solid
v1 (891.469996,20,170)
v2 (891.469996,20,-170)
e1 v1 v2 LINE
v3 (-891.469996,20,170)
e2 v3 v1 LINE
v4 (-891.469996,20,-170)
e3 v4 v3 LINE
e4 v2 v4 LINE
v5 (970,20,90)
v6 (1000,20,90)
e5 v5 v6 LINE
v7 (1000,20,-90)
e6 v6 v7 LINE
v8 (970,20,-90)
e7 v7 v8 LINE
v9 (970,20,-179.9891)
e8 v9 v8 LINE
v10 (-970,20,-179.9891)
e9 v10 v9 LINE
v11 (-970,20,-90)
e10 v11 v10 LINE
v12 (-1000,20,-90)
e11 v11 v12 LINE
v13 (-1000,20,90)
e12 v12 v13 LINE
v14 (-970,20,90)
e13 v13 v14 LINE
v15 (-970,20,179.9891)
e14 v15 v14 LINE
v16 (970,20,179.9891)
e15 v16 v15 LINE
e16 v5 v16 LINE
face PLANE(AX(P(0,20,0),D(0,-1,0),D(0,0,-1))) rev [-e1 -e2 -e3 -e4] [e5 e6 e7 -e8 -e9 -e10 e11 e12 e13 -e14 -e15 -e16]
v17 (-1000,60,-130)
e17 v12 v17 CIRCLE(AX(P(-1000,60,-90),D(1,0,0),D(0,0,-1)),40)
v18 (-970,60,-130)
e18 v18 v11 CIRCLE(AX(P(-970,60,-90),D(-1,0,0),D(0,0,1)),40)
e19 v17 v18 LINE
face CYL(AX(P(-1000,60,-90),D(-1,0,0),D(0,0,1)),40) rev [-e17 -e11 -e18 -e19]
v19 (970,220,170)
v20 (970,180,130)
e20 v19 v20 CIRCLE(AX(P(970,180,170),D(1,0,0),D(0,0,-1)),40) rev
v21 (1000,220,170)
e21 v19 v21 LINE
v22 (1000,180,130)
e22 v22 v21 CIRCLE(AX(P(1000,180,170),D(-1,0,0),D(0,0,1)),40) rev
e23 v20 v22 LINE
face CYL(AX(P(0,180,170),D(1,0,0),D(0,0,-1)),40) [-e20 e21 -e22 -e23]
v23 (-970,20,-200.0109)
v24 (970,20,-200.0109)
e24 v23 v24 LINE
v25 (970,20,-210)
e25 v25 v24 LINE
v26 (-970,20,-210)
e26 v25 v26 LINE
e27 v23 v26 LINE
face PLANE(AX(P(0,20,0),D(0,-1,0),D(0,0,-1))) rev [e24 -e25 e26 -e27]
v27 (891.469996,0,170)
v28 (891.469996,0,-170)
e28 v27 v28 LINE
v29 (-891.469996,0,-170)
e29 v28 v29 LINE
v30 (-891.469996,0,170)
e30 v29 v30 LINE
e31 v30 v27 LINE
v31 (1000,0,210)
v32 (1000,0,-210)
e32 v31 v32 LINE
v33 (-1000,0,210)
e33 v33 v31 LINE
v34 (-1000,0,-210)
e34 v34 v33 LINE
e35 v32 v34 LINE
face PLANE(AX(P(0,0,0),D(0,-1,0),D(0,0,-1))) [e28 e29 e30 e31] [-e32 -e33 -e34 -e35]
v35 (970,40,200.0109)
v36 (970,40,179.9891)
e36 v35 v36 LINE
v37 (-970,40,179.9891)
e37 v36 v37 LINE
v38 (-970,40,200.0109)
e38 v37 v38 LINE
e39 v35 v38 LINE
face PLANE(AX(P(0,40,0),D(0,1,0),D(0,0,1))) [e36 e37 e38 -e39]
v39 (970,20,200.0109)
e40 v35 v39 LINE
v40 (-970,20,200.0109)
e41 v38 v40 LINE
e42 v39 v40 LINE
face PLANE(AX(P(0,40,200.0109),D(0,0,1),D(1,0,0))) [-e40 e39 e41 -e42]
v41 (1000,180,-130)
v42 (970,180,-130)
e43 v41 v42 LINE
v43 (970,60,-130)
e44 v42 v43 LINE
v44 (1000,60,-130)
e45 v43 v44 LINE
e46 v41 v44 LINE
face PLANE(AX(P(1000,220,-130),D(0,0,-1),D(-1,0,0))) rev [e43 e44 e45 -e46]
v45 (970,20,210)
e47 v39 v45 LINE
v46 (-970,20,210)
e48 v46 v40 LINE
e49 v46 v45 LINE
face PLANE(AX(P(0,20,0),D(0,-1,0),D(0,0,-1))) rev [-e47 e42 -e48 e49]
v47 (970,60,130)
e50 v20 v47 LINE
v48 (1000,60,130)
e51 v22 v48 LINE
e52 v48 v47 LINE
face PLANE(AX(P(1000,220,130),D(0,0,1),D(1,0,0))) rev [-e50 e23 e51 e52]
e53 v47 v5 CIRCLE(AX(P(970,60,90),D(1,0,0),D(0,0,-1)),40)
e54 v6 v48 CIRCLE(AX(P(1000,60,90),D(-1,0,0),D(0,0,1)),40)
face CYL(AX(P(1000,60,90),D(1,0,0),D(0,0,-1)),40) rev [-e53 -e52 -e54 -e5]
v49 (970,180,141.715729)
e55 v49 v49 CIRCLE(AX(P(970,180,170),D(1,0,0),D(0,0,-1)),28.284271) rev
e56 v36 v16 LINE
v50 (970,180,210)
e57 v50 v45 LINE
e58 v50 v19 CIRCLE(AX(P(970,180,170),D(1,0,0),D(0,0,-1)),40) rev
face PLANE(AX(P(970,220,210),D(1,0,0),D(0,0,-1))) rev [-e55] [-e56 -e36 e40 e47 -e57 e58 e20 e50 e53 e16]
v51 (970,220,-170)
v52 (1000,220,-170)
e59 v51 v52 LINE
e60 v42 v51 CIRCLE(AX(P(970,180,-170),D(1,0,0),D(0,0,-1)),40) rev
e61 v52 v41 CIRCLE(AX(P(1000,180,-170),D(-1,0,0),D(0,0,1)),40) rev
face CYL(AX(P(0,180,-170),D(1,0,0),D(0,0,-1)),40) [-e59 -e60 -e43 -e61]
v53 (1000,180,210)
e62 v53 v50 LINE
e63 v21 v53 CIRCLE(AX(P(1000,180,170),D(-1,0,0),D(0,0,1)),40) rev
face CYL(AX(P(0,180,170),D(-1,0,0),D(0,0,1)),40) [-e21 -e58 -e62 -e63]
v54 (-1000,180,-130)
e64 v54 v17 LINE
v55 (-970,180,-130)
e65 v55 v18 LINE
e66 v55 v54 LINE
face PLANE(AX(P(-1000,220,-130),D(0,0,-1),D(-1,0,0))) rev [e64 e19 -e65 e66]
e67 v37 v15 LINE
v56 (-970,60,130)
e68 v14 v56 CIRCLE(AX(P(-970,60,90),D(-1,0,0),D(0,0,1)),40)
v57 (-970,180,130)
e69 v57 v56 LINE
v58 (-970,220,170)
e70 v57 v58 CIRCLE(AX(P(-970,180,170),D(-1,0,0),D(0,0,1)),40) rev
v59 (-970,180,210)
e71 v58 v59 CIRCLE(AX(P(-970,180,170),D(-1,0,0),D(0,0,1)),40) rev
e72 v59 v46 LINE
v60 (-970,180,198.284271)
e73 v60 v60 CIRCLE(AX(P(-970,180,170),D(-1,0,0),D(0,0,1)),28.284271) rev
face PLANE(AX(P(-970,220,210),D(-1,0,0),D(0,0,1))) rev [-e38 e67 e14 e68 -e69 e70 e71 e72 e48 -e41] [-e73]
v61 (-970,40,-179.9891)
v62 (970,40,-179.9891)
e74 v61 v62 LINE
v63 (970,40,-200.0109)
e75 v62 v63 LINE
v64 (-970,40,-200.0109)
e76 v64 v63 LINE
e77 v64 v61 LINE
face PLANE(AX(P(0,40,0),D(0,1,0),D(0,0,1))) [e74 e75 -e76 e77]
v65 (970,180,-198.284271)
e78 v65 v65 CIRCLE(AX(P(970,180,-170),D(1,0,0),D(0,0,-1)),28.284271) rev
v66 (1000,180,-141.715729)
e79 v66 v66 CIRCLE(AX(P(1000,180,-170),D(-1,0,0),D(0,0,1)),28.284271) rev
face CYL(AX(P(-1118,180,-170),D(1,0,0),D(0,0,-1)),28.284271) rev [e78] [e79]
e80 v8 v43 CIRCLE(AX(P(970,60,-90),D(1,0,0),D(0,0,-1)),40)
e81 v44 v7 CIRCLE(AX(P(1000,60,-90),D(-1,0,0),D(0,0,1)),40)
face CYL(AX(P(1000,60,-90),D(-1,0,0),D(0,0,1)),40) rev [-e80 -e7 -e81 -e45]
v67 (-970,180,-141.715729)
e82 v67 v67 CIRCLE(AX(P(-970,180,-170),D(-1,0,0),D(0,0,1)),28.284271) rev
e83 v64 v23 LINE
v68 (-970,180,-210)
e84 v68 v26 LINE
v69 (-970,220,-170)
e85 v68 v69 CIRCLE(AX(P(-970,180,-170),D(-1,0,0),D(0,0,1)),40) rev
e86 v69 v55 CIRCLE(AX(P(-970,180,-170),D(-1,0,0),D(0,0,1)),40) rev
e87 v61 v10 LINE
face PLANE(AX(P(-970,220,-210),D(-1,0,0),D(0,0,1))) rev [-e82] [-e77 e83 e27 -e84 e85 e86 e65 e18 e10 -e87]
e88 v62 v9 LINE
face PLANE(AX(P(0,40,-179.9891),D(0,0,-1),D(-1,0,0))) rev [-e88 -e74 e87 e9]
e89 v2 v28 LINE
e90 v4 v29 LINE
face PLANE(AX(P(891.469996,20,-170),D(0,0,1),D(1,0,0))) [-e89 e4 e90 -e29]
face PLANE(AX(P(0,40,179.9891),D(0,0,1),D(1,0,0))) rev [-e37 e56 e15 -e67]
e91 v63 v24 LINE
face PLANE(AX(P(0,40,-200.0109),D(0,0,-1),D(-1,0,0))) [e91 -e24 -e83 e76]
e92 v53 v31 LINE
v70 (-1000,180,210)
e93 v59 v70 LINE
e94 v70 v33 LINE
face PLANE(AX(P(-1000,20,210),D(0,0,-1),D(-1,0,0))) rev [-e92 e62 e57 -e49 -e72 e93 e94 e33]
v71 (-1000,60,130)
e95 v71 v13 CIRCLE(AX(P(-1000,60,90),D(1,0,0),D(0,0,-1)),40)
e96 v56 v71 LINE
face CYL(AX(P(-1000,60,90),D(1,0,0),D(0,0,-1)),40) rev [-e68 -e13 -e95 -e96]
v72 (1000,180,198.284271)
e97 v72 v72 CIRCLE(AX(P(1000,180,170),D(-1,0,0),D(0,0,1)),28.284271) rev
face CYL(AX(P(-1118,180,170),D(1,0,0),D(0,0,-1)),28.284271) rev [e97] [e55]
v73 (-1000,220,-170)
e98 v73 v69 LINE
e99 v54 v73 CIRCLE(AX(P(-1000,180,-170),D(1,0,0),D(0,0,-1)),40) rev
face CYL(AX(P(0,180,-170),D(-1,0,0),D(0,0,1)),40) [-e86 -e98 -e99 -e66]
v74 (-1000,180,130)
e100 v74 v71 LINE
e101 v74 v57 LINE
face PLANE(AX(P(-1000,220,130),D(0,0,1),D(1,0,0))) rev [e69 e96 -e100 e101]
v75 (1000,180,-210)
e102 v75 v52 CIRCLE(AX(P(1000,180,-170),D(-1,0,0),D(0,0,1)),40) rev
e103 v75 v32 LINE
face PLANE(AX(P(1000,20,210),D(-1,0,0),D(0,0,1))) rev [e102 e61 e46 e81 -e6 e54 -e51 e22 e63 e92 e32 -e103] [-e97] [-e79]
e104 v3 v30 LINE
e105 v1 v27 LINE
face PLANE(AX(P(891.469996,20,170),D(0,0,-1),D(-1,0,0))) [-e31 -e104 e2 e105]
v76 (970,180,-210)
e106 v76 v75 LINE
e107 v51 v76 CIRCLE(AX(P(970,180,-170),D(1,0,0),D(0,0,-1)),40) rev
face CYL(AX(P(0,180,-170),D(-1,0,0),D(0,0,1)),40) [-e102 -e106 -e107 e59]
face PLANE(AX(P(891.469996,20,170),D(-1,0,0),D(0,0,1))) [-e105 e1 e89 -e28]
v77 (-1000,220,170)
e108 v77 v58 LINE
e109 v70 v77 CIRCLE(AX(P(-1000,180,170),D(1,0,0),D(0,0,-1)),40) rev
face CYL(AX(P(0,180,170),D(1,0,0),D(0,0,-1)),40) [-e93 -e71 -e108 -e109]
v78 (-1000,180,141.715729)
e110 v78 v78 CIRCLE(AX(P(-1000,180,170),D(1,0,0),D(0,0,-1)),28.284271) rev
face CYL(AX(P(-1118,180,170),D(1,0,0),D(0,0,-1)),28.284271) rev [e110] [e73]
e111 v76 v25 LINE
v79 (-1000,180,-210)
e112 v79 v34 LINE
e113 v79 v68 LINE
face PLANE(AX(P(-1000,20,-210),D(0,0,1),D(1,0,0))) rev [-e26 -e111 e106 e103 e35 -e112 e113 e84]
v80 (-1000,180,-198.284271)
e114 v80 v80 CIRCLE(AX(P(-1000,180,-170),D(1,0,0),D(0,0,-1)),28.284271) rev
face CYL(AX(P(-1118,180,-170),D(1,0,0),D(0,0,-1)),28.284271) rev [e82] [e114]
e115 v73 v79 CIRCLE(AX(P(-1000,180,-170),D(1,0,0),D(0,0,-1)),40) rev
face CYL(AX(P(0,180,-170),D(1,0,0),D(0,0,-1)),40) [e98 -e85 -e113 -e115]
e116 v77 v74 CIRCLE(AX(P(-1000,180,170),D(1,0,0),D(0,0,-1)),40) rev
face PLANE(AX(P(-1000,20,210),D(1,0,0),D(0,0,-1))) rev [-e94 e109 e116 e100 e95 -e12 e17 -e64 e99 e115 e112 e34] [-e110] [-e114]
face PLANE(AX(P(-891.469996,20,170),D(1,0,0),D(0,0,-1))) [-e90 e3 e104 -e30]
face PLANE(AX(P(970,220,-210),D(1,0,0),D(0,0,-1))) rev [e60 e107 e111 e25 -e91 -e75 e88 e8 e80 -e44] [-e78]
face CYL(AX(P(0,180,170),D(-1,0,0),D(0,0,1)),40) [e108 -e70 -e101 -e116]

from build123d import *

# Parameters (mm, degrees)
SKETCH1_W               = 2000
SKETCH1_H               = 420
SKETCH1_W_2             = 1782.939992392
SKETCH1_H_2             = 340
BOSS_EXTRUDE1_DEPTH     = 20
SKETCH3_W               = 30
SKETCH3_H               = 80
BOSS_EXTRUDE2_DEPTH     = 200
FILLET1_R               = 40
FILLET2_R               = 40
SKETCH5_W               = 972.378142936
SKETCH5_H               = 20.021799472
SKETCH5_W_2             = 1944.756285872
BOSS_EXTRUDE5_DEPTH     = 20
CUT_EXTRUDE3_DEPTH      = 2088
CUT_EXTRUDE3_DEPTH_BACK = 85
SKETCH9_R               = 28.284271247


with BuildPart() as part:
    # Sketch1 → Boss-Extrude1 (new body)
    with BuildSketch(Plane(origin=(0, 0, 0), x_dir=(1, 0, 0), z_dir=(0, 1, 0))):
        Rectangle(SKETCH1_W, SKETCH1_H)
        Rectangle(SKETCH1_W_2, SKETCH1_H_2, mode=Mode.SUBTRACT)
    extrude(amount=BOSS_EXTRUDE1_DEPTH)

    # Sketch3 → Boss-Extrude2 (add)
    with BuildSketch(Plane(origin=(0, 20, 0), x_dir=(1, 0, 0), z_dir=(0, 1, 0))):
        with Locations((-985, 170)):
            Rectangle(SKETCH3_W, SKETCH3_H)
        with Locations((985, -170)):
            Rectangle(SKETCH3_W, SKETCH3_H)
        with Locations((985, 170)):
            Rectangle(SKETCH3_W, SKETCH3_H)
        with Locations((-985, -170)):
            Rectangle(SKETCH3_W, SKETCH3_H)
    extrude(amount=BOSS_EXTRUDE2_DEPTH)

    # Fillet1
    fillet1_edges = [part.edges().sort_by_distance(p)[0] for p in [
        (-985, 220, -210),
        (-985, 220, -130),
        (-985, 220, 130),
        (-985, 220, 210),
        (985, 220, -210),
        (985, 220, -130),
        (985, 220, 130),
        (985, 220, 210),
    ]]
    fillet(fillet1_edges, radius=FILLET1_R - 0.0001)  # a hair under: the kernel refuses the full size

    # Fillet2
    fillet2_edges = [part.edges().sort_by_distance(p)[0] for p in [
        (985, 20, 130),
        (985, 20, -130),
        (-985, 20, -130),
        (-985, 20, 130),
    ]]
    fillet(fillet2_edges, radius=FILLET2_R)

    # Sketch5 → Boss-Extrude5 (add)
    with BuildSketch(Plane(origin=(0, 20, 0), x_dir=(1, 0, 0), z_dir=(0, 1, 0))):
        with Locations((486.189071468, -190)):
            Rectangle(SKETCH5_W, SKETCH5_H)
        with Locations((0, 190)):
            Rectangle(SKETCH5_W_2, SKETCH5_H)
        with Locations((-486.189071468, -190)):
            Rectangle(SKETCH5_W, SKETCH5_H)
    extrude(amount=BOSS_EXTRUDE5_DEPTH)

    # Sketch9 → Cut-Extrude3 (cut, two sides: drawn at the far end of the back side and taken through both)
    with BuildSketch(Plane.ZY.offset(-970).offset(-CUT_EXTRUDE3_DEPTH_BACK)):
        with Locations(Location((-170, 180, 0), (0, 0, 180))):
            Circle(SKETCH9_R)
        with Locations(Location((170, 180, 0), (0, 0, 180))):
            Circle(SKETCH9_R)
    extrude(amount=CUT_EXTRUDE3_DEPTH + CUT_EXTRUDE3_DEPTH_BACK, mode=Mode.SUBTRACT)


solid = part.part
